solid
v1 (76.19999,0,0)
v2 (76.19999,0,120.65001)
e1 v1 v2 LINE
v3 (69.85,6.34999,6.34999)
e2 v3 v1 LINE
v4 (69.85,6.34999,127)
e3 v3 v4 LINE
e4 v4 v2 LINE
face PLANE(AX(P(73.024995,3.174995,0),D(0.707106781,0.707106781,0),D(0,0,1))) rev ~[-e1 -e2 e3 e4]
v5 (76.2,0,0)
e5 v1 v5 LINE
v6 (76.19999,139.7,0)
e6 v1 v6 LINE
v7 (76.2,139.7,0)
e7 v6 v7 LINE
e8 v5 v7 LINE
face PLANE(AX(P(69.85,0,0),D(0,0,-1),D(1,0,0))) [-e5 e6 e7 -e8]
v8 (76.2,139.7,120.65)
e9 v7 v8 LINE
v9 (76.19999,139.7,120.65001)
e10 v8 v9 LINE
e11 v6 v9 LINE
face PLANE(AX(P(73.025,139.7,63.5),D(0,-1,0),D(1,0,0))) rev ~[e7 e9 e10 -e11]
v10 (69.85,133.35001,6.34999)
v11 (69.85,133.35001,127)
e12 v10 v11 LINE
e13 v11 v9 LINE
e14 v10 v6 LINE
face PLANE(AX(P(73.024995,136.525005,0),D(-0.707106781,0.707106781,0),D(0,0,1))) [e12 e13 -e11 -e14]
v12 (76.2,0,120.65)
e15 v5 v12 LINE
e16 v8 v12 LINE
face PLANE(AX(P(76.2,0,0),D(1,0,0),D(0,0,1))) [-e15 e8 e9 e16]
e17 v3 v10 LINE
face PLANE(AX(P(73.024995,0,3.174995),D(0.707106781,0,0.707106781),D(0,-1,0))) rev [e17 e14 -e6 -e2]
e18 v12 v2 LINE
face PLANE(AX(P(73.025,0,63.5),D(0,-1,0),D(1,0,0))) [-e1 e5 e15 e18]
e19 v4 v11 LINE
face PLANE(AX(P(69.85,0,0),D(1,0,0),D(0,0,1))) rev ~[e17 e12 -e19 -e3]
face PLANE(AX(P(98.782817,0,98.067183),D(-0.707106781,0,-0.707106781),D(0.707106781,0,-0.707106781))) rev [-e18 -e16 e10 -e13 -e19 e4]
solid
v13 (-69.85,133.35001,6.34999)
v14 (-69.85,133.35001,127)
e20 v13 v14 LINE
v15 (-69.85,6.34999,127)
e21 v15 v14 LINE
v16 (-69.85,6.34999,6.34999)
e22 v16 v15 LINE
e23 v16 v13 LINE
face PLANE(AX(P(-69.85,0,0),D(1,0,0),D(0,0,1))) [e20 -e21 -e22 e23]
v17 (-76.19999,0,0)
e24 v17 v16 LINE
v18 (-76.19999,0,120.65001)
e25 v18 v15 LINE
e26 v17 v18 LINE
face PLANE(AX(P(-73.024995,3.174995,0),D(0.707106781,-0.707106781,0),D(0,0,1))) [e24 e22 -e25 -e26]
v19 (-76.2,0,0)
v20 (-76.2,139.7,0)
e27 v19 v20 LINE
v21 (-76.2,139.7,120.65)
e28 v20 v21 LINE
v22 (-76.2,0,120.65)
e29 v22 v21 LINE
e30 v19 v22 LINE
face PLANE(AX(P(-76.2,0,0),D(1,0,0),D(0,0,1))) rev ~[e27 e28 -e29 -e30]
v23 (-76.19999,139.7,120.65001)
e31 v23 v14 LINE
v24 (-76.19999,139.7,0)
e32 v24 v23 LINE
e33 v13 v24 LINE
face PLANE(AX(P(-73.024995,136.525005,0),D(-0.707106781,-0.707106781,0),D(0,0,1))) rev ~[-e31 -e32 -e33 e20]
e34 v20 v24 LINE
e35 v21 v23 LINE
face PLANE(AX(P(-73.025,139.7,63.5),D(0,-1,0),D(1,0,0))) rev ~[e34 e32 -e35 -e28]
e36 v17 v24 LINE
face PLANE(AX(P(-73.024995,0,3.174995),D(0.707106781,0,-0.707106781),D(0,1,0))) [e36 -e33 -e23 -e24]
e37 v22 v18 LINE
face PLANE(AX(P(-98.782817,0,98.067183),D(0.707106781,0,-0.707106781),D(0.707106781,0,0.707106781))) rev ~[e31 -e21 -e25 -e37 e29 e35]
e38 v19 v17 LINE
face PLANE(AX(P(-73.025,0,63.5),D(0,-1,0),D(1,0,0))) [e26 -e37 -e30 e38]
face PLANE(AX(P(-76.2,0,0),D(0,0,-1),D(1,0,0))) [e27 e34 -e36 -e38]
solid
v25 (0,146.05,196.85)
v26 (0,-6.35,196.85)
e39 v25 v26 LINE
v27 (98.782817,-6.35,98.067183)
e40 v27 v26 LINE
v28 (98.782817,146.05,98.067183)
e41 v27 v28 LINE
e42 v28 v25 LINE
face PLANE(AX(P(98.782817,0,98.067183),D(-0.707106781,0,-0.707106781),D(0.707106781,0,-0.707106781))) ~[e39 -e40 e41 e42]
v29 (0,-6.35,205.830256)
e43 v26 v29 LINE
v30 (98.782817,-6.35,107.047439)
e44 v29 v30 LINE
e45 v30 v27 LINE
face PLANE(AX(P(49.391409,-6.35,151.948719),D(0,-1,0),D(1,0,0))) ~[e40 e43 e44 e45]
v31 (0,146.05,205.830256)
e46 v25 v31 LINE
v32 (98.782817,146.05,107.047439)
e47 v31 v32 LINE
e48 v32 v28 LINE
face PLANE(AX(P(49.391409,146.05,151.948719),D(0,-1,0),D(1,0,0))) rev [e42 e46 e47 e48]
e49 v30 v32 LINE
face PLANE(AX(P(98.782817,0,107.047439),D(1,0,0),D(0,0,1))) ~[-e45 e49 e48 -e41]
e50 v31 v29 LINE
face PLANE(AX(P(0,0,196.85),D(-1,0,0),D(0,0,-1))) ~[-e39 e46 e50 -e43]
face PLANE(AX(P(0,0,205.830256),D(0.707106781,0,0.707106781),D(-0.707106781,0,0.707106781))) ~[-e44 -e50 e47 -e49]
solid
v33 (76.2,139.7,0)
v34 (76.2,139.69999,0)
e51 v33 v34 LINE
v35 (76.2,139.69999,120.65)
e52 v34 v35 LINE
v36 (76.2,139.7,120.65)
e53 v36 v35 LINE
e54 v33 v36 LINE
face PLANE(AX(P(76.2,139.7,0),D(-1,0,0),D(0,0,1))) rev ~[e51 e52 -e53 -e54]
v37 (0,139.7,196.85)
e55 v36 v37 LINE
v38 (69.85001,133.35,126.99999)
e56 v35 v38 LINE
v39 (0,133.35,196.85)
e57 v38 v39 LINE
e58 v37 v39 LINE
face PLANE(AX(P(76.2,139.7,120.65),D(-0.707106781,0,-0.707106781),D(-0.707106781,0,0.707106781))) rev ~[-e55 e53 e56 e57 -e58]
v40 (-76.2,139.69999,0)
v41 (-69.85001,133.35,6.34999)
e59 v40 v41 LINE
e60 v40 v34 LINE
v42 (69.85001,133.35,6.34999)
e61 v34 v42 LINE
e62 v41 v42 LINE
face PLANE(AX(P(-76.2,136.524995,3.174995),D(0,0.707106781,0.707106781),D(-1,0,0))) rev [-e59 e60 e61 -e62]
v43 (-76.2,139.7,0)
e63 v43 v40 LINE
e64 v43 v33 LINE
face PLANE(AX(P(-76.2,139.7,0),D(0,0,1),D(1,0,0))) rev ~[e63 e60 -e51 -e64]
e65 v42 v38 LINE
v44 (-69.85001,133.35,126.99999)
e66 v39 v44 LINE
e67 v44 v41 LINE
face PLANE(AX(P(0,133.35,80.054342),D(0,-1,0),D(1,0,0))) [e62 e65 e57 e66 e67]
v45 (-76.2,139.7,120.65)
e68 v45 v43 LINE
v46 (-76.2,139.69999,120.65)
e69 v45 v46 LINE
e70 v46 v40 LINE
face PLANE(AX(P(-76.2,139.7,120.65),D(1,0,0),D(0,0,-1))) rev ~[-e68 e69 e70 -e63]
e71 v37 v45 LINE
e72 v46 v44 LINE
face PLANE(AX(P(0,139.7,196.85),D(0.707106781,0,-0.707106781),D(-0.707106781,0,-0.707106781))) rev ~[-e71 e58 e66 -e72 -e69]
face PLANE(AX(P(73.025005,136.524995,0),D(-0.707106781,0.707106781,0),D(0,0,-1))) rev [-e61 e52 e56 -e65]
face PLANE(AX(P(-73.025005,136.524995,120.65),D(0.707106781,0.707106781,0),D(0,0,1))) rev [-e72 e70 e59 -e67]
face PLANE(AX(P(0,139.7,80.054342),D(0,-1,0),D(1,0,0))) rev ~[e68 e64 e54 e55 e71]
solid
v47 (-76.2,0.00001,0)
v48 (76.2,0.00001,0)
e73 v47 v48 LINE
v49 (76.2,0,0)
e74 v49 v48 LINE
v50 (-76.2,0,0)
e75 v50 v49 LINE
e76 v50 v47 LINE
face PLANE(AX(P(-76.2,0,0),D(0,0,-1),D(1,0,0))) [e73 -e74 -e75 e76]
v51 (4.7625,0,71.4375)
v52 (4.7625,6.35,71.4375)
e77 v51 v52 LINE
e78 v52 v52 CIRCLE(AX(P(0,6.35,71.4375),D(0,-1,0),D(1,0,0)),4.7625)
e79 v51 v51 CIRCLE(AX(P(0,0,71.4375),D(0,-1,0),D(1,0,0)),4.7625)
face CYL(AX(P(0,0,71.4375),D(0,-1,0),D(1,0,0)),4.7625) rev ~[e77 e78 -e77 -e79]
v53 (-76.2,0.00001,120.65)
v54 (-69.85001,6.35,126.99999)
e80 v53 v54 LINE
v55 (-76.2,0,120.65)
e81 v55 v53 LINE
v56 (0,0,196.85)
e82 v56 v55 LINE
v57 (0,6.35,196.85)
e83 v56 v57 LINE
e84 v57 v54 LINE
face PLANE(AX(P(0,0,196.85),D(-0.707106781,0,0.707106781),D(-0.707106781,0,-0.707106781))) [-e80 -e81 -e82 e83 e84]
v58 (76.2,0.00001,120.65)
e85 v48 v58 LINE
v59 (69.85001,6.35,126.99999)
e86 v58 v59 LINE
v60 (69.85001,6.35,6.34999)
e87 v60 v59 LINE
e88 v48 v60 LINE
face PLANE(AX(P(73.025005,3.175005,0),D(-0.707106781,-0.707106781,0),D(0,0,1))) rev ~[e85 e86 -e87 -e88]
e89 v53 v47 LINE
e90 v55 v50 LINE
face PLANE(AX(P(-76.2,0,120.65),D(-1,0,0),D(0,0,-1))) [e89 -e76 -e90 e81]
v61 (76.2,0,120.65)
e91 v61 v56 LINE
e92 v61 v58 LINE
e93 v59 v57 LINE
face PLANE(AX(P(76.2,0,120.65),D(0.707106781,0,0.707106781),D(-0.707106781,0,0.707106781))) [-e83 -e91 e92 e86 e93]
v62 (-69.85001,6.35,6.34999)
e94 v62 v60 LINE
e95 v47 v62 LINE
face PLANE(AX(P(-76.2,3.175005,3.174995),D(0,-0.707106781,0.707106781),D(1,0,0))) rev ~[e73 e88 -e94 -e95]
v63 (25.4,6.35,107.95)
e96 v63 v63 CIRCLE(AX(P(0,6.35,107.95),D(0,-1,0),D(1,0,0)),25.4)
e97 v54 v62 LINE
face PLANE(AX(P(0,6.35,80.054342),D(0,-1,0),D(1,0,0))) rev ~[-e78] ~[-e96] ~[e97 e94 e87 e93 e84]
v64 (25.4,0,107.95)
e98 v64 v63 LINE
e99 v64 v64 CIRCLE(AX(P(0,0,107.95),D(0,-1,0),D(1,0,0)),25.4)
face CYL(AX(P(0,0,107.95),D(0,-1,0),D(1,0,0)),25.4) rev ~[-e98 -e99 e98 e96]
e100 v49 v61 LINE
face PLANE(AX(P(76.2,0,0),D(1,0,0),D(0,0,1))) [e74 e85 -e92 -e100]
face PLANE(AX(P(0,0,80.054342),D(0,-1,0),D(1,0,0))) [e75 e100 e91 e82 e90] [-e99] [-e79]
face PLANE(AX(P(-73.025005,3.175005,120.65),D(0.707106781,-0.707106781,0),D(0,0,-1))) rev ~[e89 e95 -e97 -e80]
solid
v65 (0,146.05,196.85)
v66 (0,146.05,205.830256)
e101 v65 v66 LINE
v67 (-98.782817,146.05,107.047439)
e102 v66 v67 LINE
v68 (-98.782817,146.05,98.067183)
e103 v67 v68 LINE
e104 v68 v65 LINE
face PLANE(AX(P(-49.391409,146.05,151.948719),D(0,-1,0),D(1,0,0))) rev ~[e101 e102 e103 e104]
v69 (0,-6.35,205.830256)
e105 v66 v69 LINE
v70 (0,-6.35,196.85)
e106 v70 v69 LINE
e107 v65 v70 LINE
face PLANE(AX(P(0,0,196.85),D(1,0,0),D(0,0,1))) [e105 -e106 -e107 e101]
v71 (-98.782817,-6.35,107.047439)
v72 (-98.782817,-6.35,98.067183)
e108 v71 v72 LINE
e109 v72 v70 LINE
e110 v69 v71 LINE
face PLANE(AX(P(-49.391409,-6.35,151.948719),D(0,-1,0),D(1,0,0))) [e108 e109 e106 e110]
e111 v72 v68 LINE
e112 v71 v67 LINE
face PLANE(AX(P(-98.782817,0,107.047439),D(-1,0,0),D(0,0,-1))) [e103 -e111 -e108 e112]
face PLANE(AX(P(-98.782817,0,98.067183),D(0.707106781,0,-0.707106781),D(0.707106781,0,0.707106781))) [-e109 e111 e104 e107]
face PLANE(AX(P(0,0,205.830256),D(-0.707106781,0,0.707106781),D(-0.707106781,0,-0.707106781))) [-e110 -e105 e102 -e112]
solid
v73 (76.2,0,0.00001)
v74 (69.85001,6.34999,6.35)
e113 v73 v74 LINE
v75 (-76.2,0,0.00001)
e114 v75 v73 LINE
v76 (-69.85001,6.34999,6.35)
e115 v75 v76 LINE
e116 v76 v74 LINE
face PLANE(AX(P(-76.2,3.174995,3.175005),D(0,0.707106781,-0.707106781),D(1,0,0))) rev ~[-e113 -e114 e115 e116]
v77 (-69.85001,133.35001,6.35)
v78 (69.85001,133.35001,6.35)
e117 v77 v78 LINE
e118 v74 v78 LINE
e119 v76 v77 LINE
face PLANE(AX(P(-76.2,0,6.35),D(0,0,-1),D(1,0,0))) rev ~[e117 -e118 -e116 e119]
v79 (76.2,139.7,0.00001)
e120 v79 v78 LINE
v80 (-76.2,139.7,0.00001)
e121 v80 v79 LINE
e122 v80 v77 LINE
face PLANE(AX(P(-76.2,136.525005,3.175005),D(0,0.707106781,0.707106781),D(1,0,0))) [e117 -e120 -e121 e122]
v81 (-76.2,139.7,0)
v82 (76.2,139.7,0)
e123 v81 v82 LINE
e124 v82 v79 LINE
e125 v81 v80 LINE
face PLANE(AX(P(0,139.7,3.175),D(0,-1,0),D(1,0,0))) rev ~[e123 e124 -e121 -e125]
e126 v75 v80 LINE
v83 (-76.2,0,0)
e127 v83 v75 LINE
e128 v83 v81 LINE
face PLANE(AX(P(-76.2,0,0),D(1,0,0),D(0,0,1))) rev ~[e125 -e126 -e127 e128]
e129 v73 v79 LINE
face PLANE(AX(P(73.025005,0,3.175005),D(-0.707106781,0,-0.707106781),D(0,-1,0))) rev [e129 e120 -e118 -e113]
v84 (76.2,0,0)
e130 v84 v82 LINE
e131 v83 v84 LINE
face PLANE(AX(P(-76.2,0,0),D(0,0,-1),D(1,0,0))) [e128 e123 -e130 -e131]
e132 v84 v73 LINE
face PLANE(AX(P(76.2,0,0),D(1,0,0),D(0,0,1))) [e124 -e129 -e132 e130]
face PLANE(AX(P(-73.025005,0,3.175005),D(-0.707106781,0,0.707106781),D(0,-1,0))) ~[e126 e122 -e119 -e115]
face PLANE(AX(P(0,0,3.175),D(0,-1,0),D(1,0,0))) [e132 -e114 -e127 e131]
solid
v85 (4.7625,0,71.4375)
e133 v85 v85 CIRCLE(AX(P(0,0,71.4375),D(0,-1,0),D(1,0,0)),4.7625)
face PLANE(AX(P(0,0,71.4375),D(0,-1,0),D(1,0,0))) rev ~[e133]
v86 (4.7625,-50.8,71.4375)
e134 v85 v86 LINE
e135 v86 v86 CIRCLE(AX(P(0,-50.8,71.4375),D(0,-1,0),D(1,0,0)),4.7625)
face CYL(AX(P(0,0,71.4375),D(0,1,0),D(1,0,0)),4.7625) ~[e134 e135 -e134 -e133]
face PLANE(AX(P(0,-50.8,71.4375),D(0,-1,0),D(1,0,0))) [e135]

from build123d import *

# Parameters (mm, degrees)
F0_W           = 152.4
F0_H           = 6.35
F1_DEPTH       = 139.7
F2_SIZE2       = 6.34999
F2_SIZE        = 6.34999
F3_W           = 6.35
F3_H           = 127
F4_DEPTH       = 139.7
F5_SIZE2       = 6.34999
F5_SIZE        = 6.34999
F5_2_SIZE2     = 6.34999
F5_2_SIZE      = 6.34999
F7_R           = 4.7625
F7_R_2         = 25.4
F8_DEPTH       = 6.35
F10_DEPTH      = 6.35
F11_SIZE2      = 6.34999
F11_SIZE       = 6.34999
F11_2_SIZE2    = 6.34999
F11_2_SIZE     = 6.34999
F13_DEPTH      = 6.35
F13_DEPTH_BACK = 146.05
F16_DEPTH      = 50.8


# Not quite as in the source:
# - a fillet or chamfer is up to 0.001 mm smaller than in the source, because OpenCascade refuses the exact size


with BuildPart() as f1:
    # F0 (on Front) → F1 (new body)
    with BuildSketch(Plane.XZ):
        with Locations((0, 3.175)):
            Rectangle(F0_W, F0_H)
    extrude(amount=-F1_DEPTH)

    # F2 (size 6.35 and 6.35 in the source; OpenCascade refuses exactly that, so slightly less here)
    f2_edges = [f1.edges().sort_by_distance(p)[0] for p in [
        (76.2, 69.85, 6.35),
        (-76.2, 69.85, 6.35),
        (0, 0, 6.35),
        (0, 139.7, 6.35),
    ]]
    chamfer(f2_edges, length=F2_SIZE, length2=F2_SIZE2)


with BuildPart() as f4:
    # F3 (on Front) → F4 (new body)
    with BuildSketch(Plane.XZ):
        with Locations((-73.025, 63.5)):
            Rectangle(F3_W, F3_H)
    extrude(amount=-F4_DEPTH)

    # F5 (size 6.35 and 6.35 in the source; OpenCascade refuses exactly that, so slightly less here)
    f5_edges = [f4.edges().sort_by_distance(p)[0] for p in [
        (-69.85, 139.7, 63.5),
        (-69.85, 69.85, 0),
        (-69.85, 0, 63.5),
    ]]
    chamfer(f5_edges, length=F5_SIZE, length2=F5_SIZE2)


with BuildPart() as f4b:
    # F3 (on Front) → F4, piece 2 (new body)
    with BuildSketch(Plane.XZ):
        with Locations((73.025, 63.5)):
            Rectangle(F3_W, F3_H)
    extrude(amount=-F4_DEPTH)

    # F5#2 (size 6.35 and 6.35 in the source; OpenCascade refuses exactly that, so slightly less here)
    f5_2_edges = [f4b.edges().sort_by_distance(p)[0] for p in [
        (69.85, 0, 63.5),
        (69.85, 69.85, 0),
        (69.85, 139.7, 63.5),
    ]]
    chamfer(f5_2_edges, length=F5_2_SIZE, length2=F5_2_SIZE2)


with BuildPart() as f8:
    # F7 (on Front) → F8 (new body)
    with BuildSketch(Plane.XZ):
        Polygon((76.2, 120.65), (0, 196.85), (-76.2, 120.65), (-76.2, 0), (76.2, 0), align=None)
        with Locations((0, 71.4375)):
            Circle(F7_R, mode=Mode.SUBTRACT)
        with Locations((0, 107.95)):
            Circle(F7_R_2, mode=Mode.SUBTRACT)
    extrude(amount=-F8_DEPTH)

    # F11 (size 6.35 and 6.35 in the source; OpenCascade refuses exactly that, so slightly less here)
    f11_edges = [f8.edges().sort_by_distance(p)[0] for p in [
        (76.2, 6.35, 60.325),
        (0, 6.35, 0),
        (-76.2, 6.35, 60.325),
    ]]
    chamfer(f11_edges, length=F11_SIZE, length2=F11_SIZE2)


with BuildPart() as f10:
    # F9 (on offset) → F10 (new body)
    with BuildSketch(Plane.XZ.offset(-139.7)):
        Polygon((76.2, 120.65), (0, 196.85), (-76.2, 120.65), (-76.2, 0), (76.2, 0), align=None)
    extrude(amount=F10_DEPTH)

    # F11#2 (size 6.35 and 6.35 in the source; OpenCascade refuses exactly that, so slightly less here)
    f11_2_edges = [f10.edges().sort_by_distance(p)[0] for p in [
        (-76.2, 133.35, 60.325),
        (0, 133.35, 0),
        (76.2, 133.35, 60.325),
    ]]
    chamfer(f11_2_edges, length=F11_2_SIZE, length2=F11_2_SIZE2)


with BuildPart() as f13:
    # F12 (on Front) → F13 (new body, two sides)
    with BuildSketch(Plane.XZ) as f13_sk:
        Polygon((-98.7828173318, 98.0671826682), (0, 196.85), (0, 205.8302561211), (-98.7828173318, 107.0474387893), align=None)
    extrude(amount=F13_DEPTH)
    extrude(f13_sk.sketch, amount=-F13_DEPTH_BACK)


with BuildPart() as f14_1:
    # F14: instance of F13
    add(f13.part.mirror(Plane.YZ))


with BuildPart() as f4_1:
    add(f4.part)

    # F15: cut F13, F14_1
    add(f13.part, mode=Mode.SUBTRACT)
    add(f14_1.part, mode=Mode.SUBTRACT)


with BuildPart() as f4b_1:
    add(f4b.part)

    # F15: cut F13, F14_1
    add(f13.part, mode=Mode.SUBTRACT)
    add(f14_1.part, mode=Mode.SUBTRACT)


with BuildPart() as f16:
    # F7 (on Front) → F16 (new body)
    with BuildSketch(Plane.XZ):
        with Locations((0, 71.4375)):
            Circle(F7_R)
    extrude(amount=F16_DEPTH)


solid = Compound([f1.part, f8.part, f10.part, f13.part, f14_1.part, f4_1.part, f4b_1.part, f16.part])
